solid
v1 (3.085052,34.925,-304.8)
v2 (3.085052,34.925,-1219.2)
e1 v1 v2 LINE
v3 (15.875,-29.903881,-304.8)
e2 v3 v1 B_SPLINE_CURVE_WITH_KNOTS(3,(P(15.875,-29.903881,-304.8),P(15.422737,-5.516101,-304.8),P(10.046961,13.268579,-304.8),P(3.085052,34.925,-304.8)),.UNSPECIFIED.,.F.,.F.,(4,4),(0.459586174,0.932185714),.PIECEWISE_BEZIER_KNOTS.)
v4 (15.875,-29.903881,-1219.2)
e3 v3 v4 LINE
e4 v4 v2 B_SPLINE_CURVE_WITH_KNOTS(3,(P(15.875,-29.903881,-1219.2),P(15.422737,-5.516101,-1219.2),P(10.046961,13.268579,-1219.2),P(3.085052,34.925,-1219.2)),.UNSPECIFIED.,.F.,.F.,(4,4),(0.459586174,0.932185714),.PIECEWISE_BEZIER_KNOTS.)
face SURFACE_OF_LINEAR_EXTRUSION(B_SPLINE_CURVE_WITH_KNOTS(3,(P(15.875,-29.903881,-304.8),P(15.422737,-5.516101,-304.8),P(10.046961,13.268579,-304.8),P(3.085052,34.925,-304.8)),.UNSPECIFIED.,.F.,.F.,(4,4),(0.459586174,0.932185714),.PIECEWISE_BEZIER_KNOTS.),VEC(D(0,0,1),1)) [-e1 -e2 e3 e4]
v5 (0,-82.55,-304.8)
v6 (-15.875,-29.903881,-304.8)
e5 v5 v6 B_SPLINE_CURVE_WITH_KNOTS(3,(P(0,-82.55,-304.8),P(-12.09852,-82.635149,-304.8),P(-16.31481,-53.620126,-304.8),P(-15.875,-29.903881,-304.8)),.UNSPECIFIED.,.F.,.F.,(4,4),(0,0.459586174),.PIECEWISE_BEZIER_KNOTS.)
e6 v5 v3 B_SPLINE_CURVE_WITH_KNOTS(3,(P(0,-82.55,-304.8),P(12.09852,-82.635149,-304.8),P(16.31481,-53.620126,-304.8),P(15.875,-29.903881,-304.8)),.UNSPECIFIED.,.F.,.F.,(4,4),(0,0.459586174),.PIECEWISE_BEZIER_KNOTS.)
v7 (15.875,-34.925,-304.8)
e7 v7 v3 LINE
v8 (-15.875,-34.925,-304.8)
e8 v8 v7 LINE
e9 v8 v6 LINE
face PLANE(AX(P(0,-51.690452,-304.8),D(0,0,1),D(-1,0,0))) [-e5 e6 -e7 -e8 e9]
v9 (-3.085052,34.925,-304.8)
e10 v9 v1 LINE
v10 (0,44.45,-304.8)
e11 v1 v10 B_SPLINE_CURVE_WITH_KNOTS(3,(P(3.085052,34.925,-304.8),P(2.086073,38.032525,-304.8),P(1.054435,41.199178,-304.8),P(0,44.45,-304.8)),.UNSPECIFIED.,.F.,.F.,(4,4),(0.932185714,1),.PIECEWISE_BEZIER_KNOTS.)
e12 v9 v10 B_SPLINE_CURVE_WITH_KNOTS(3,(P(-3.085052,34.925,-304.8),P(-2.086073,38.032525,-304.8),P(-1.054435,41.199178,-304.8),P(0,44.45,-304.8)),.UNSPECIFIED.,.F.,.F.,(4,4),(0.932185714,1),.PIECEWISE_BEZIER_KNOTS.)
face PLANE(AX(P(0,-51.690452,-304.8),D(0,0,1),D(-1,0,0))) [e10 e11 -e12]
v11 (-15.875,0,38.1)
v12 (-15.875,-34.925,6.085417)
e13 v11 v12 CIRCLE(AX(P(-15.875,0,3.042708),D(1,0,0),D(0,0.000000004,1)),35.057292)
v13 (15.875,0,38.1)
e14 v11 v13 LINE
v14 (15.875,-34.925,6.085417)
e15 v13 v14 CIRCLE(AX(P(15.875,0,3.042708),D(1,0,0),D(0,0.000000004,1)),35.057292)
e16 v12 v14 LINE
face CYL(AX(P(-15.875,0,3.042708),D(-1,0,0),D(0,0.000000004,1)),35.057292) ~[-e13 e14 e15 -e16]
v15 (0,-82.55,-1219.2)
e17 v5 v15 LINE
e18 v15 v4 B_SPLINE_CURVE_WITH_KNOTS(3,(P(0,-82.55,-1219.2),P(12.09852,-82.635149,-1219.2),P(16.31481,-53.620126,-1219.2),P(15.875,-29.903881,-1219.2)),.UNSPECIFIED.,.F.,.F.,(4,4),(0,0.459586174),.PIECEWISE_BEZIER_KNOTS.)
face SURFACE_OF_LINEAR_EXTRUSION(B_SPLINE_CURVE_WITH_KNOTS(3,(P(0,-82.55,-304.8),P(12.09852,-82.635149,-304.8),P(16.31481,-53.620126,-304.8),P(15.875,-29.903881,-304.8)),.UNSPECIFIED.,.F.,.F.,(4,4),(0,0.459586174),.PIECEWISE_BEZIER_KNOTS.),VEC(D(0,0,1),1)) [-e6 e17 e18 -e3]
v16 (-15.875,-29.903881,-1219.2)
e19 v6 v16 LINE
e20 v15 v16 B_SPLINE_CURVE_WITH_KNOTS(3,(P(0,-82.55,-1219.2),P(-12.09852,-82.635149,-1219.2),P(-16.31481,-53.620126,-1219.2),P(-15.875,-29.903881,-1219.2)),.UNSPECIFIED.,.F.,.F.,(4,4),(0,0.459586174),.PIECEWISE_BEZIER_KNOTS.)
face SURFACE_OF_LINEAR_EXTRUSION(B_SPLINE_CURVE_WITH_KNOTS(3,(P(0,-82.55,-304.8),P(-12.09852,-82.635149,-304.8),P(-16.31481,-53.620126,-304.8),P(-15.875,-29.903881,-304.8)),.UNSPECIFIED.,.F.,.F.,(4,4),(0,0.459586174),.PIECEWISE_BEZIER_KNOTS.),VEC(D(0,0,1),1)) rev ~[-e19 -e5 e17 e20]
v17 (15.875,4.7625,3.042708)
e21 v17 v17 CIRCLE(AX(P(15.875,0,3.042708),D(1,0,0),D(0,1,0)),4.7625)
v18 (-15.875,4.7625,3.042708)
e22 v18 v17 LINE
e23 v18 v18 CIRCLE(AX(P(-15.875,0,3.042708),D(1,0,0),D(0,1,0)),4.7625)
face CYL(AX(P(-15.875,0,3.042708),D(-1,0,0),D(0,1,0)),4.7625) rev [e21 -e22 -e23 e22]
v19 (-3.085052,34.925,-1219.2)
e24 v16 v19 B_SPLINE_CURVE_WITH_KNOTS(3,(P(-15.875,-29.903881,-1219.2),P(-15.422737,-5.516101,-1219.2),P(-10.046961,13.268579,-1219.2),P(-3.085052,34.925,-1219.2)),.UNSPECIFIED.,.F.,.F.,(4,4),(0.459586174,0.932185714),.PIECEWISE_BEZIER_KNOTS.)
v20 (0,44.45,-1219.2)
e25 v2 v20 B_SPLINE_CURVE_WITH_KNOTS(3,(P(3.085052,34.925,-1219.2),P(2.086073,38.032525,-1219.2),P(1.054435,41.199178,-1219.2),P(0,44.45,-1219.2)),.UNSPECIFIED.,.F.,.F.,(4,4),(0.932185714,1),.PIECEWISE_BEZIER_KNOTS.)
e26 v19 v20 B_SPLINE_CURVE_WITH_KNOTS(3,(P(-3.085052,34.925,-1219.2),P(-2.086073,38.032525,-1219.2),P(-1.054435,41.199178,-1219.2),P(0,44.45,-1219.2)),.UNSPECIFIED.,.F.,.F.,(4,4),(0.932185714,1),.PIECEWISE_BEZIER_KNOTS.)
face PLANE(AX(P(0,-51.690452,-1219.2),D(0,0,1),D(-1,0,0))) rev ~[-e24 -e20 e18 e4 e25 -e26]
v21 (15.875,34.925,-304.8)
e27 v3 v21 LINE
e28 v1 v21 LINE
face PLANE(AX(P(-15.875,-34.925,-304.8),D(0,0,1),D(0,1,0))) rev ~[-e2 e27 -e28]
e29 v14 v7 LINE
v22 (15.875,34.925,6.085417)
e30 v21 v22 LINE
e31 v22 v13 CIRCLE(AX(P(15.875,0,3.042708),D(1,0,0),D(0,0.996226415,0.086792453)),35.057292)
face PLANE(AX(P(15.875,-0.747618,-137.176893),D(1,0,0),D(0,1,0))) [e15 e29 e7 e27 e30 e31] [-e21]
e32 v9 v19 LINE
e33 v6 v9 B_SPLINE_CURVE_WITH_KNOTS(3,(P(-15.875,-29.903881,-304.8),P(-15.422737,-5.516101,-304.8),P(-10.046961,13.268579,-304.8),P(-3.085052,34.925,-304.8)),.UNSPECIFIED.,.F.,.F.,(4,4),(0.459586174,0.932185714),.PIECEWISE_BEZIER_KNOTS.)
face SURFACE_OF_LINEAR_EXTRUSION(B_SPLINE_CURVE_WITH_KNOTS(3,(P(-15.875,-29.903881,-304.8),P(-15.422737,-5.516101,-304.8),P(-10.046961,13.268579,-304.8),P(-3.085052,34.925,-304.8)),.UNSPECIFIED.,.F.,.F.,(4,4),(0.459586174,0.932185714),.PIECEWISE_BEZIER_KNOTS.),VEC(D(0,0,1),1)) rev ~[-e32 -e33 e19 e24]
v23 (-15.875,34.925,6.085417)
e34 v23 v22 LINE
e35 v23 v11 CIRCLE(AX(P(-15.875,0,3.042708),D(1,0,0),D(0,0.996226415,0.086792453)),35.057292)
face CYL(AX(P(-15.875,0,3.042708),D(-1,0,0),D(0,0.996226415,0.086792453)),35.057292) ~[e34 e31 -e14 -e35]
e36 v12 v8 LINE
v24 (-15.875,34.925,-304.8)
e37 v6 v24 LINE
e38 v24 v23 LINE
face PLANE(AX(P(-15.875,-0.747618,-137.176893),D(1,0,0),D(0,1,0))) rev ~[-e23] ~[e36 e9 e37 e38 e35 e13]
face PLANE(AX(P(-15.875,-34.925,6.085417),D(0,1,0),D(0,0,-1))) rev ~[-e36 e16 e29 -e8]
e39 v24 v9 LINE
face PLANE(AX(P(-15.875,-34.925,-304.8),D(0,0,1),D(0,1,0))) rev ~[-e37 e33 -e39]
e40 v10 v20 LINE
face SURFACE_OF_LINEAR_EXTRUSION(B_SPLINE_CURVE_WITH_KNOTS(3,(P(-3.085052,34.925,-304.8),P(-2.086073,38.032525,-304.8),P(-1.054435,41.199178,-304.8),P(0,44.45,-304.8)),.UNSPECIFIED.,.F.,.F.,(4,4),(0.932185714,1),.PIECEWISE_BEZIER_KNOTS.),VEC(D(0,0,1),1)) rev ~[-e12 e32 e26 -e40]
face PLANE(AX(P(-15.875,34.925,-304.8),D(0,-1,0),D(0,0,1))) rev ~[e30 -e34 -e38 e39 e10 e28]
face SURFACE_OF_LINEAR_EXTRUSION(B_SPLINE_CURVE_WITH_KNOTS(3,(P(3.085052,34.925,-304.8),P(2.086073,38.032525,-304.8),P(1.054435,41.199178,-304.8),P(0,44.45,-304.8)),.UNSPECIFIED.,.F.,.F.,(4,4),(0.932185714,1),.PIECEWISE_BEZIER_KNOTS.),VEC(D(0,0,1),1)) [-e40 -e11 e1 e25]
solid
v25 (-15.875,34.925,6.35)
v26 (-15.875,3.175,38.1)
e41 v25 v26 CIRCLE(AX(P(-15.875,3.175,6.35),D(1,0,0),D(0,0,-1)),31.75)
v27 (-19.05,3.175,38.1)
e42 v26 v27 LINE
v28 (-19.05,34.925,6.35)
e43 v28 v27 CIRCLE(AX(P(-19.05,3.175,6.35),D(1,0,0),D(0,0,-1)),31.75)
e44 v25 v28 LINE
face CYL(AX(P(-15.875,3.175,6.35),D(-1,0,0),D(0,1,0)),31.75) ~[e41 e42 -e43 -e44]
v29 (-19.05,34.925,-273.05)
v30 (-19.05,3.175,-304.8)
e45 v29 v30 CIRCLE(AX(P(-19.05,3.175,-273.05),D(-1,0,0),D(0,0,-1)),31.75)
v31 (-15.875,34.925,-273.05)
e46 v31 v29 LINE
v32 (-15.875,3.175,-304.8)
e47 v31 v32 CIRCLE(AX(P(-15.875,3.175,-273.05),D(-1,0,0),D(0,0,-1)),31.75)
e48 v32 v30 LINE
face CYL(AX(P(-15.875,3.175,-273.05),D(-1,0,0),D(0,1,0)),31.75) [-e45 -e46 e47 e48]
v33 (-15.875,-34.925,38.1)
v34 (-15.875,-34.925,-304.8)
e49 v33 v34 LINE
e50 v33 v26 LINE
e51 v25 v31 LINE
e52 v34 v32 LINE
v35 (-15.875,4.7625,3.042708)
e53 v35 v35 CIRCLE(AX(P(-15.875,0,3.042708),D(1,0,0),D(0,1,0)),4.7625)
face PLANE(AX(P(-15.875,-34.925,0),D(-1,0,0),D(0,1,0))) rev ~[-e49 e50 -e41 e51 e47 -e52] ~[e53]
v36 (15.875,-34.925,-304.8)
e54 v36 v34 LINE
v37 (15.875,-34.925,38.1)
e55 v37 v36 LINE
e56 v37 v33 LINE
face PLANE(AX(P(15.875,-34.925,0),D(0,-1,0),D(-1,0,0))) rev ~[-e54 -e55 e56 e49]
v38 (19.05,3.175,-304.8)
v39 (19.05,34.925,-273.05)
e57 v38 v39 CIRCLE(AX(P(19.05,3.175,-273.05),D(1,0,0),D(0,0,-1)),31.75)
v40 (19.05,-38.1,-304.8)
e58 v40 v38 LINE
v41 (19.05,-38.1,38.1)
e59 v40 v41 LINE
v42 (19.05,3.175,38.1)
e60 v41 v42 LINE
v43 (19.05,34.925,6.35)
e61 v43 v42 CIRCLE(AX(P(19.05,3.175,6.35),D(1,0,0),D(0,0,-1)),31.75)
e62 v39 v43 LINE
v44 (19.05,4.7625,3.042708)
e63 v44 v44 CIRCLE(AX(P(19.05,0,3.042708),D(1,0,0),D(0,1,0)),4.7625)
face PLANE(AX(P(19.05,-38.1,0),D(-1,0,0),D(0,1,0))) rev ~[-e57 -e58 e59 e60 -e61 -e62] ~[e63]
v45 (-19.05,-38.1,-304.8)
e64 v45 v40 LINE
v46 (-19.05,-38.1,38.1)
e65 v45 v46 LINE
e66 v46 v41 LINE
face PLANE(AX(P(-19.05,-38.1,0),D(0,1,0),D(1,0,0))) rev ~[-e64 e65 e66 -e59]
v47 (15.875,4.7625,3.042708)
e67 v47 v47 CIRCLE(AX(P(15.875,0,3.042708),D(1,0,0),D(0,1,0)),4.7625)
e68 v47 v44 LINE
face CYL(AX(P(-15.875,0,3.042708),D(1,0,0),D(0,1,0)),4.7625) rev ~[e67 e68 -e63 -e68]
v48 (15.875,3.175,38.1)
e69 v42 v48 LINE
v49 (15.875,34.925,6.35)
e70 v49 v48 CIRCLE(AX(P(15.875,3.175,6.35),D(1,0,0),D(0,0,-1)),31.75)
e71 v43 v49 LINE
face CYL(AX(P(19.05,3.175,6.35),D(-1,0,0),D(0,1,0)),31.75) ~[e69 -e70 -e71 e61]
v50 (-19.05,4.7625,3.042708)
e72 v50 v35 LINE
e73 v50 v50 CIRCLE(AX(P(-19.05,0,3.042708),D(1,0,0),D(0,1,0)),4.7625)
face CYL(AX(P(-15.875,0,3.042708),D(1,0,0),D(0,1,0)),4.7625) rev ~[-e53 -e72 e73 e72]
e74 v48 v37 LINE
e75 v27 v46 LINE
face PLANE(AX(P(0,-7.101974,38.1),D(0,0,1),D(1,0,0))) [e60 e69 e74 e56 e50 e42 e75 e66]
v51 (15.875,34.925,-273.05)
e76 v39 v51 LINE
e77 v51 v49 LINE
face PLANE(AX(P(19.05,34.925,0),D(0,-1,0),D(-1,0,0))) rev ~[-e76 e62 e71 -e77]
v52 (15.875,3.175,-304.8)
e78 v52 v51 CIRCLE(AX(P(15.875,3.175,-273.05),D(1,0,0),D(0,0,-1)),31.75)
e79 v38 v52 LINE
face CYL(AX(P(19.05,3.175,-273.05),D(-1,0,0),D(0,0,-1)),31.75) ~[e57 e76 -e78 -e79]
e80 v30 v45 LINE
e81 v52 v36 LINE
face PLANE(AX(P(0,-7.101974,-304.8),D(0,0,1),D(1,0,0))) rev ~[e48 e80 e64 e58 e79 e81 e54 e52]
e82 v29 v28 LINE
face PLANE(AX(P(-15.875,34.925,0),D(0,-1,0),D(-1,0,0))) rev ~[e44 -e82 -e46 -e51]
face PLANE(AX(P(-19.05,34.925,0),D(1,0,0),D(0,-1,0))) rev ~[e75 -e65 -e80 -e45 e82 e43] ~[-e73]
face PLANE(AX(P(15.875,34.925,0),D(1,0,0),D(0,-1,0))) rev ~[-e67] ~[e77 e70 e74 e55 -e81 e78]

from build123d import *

# Parameters (mm, degrees)
F1_DEPTH      = 304.8
F1_DEPTH_BACK = 38.1
F2_R          = 31.75
F3_R          = 4.7625
F4_DEPTH      = 31.75
F6_DEPTH      = 914.4
F7_DEPTH      = 50.8


with BuildPart() as f1:
    # F0 (on Top) → F1 (new body, two sides)
    with BuildSketch(Plane.XY) as f1_sk:
        Polygon((-15.875, 34.925), (-19.05, 34.925), (-19.05, -38.1), (19.05, -38.1), (19.05, 34.925), (15.875, 34.925), (15.875, -34.925), (-15.875, -34.925), align=None)
    extrude(amount=-F1_DEPTH)
    extrude(f1_sk.sketch, amount=F1_DEPTH_BACK)

    # F2
    f2_edges = [f1.edges().sort_by_distance(p)[0] for p in [
        (-17.4625, 34.925, 38.1),
        (17.4625, 34.925, 38.1),
        (-17.4625, 34.925, -304.8),
        (17.4625, 34.925, -304.8),
    ]]
    fillet(f2_edges, radius=F2_R)

    # F3 (on face) → F7 (cut, symmetric)
    with BuildSketch(Plane.YZ.offset(-15.875)):
        with Locations((0, 3.0427083333)):
            Circle(F3_R)
    extrude(amount=F7_DEPTH, both=True, mode=Mode.SUBTRACT)


with BuildPart() as f4:
    # F3 (on face) → F4 (new body, through all)
    with BuildSketch(Plane.YZ.offset(-15.875)):
        with BuildLine():
            Line((34.925, -273.05), (34.925, 0))
            Line((34.925, 0), (34.925, 6.0854166667))
            ThreePointArc((34.925, 6.0854166667), (23.6890754365, 28.8853359855), (1.308e-07, 38.1))
            ThreePointArc((1.308e-07, 38.1), (-23.6890753401, 28.8853360738), (-34.925, 6.0854166667))
            Line((-34.925, 6.0854166667), (-34.925, 0))
            Line((-34.925, 0), (-34.925, -304.8))
            Line((-34.925, -304.8), (3.175, -304.8))
            ThreePointArc((3.175, -304.8), (25.6256403027, -295.5006403027), (34.925, -273.05))
        make_face()
        with Locations((0, 3.0427083333)):
            Circle(F3_R, mode=Mode.SUBTRACT)
        with BuildLine():
            Line((34.925, -304.8), (34.925, -273.05))
            ThreePointArc((34.925, -273.05), (25.6256403027, -295.5006403027), (3.175, -304.8))
            Line((3.175, -304.8), (34.925, -304.8))
        make_face()
    extrude(amount=F4_DEPTH)

    # F5 (on face) → F6 (join)
    with BuildSketch(Plane(origin=(0, 0, -304.8), x_dir=(1, 0, 0), z_dir=(0, 0, -1))):
        with BuildLine():
            add(Edge.make_bspline(
                [(0, 82.55), (12.0985200629, 82.6351493597), (16.314810061, 53.6201264646), (15.875, 29.9038812518)],
                knots=[0, 0, 0, 0, 0.4595861737, 0.4595861737, 0.4595861737, 0.4595861737], degree=3))
            add(Edge.make_bspline(
                [(0, 82.55), (-12.0985200629, 82.6351493597), (-16.314810061, 53.6201264646), (-15.875, 29.9038812518)],
                knots=[0, 0, 0, 0, 0.4595861737, 0.4595861737, 0.4595861737, 0.4595861737], degree=3))
            Line((-15.875, 29.9038812518), (-15.875, 34.925))
            Line((-15.875, 34.925), (15.875, 34.925))
            Line((15.875, 34.925), (15.875, 29.9038812518))
        make_face()
        with BuildLine():
            add(Edge.make_bspline(
                [(15.875, 29.9038812518), (15.4227365407, 5.516101041), (10.0469612559, -13.2685790973), (3.0850515824, -34.925)],
                knots=[0.4595861737, 0.4595861737, 0.4595861737, 0.4595861737, 0.9321857143, 0.9321857143, 0.9321857143, 0.9321857143], degree=3))
            Line((15.875, 29.9038812518), (15.875, 34.925))
            Line((15.875, 34.925), (-15.875, 34.925))
            Line((-15.875, 34.925), (-15.875, 29.9038812518))
            add(Edge.make_bspline(
                [(-15.875, 29.9038812518), (-15.4227365407, 5.516101041), (-10.0469612559, -13.2685790973), (-3.0850515824, -34.925)],
                knots=[0.4595861737, 0.4595861737, 0.4595861737, 0.4595861737, 0.9321857143, 0.9321857143, 0.9321857143, 0.9321857143], degree=3))
            Line((-3.0850515824, -34.925), (3.0850515824, -34.925))
        make_face()
        with BuildLine():
            add(Edge.make_bspline(
                [(3.0850515824, -34.925), (2.0860727621, -38.0325246332), (1.0544354764, -41.1991783333), (0, -44.45)],
                knots=[0.9321857143, 0.9321857143, 0.9321857143, 0.9321857143, 1, 1, 1, 1], degree=3))
            Line((3.0850515824, -34.925), (-3.0850515824, -34.925))
            add(Edge.make_bspline(
                [(-3.0850515824, -34.925), (-2.0860727621, -38.0325246332), (-1.0544354764, -41.1991783333), (0, -44.45)],
                knots=[0.9321857143, 0.9321857143, 0.9321857143, 0.9321857143, 1, 1, 1, 1], degree=3))
        make_face()
    extrude(amount=F6_DEPTH)


solid = Compound([f1.part, f4.part])
